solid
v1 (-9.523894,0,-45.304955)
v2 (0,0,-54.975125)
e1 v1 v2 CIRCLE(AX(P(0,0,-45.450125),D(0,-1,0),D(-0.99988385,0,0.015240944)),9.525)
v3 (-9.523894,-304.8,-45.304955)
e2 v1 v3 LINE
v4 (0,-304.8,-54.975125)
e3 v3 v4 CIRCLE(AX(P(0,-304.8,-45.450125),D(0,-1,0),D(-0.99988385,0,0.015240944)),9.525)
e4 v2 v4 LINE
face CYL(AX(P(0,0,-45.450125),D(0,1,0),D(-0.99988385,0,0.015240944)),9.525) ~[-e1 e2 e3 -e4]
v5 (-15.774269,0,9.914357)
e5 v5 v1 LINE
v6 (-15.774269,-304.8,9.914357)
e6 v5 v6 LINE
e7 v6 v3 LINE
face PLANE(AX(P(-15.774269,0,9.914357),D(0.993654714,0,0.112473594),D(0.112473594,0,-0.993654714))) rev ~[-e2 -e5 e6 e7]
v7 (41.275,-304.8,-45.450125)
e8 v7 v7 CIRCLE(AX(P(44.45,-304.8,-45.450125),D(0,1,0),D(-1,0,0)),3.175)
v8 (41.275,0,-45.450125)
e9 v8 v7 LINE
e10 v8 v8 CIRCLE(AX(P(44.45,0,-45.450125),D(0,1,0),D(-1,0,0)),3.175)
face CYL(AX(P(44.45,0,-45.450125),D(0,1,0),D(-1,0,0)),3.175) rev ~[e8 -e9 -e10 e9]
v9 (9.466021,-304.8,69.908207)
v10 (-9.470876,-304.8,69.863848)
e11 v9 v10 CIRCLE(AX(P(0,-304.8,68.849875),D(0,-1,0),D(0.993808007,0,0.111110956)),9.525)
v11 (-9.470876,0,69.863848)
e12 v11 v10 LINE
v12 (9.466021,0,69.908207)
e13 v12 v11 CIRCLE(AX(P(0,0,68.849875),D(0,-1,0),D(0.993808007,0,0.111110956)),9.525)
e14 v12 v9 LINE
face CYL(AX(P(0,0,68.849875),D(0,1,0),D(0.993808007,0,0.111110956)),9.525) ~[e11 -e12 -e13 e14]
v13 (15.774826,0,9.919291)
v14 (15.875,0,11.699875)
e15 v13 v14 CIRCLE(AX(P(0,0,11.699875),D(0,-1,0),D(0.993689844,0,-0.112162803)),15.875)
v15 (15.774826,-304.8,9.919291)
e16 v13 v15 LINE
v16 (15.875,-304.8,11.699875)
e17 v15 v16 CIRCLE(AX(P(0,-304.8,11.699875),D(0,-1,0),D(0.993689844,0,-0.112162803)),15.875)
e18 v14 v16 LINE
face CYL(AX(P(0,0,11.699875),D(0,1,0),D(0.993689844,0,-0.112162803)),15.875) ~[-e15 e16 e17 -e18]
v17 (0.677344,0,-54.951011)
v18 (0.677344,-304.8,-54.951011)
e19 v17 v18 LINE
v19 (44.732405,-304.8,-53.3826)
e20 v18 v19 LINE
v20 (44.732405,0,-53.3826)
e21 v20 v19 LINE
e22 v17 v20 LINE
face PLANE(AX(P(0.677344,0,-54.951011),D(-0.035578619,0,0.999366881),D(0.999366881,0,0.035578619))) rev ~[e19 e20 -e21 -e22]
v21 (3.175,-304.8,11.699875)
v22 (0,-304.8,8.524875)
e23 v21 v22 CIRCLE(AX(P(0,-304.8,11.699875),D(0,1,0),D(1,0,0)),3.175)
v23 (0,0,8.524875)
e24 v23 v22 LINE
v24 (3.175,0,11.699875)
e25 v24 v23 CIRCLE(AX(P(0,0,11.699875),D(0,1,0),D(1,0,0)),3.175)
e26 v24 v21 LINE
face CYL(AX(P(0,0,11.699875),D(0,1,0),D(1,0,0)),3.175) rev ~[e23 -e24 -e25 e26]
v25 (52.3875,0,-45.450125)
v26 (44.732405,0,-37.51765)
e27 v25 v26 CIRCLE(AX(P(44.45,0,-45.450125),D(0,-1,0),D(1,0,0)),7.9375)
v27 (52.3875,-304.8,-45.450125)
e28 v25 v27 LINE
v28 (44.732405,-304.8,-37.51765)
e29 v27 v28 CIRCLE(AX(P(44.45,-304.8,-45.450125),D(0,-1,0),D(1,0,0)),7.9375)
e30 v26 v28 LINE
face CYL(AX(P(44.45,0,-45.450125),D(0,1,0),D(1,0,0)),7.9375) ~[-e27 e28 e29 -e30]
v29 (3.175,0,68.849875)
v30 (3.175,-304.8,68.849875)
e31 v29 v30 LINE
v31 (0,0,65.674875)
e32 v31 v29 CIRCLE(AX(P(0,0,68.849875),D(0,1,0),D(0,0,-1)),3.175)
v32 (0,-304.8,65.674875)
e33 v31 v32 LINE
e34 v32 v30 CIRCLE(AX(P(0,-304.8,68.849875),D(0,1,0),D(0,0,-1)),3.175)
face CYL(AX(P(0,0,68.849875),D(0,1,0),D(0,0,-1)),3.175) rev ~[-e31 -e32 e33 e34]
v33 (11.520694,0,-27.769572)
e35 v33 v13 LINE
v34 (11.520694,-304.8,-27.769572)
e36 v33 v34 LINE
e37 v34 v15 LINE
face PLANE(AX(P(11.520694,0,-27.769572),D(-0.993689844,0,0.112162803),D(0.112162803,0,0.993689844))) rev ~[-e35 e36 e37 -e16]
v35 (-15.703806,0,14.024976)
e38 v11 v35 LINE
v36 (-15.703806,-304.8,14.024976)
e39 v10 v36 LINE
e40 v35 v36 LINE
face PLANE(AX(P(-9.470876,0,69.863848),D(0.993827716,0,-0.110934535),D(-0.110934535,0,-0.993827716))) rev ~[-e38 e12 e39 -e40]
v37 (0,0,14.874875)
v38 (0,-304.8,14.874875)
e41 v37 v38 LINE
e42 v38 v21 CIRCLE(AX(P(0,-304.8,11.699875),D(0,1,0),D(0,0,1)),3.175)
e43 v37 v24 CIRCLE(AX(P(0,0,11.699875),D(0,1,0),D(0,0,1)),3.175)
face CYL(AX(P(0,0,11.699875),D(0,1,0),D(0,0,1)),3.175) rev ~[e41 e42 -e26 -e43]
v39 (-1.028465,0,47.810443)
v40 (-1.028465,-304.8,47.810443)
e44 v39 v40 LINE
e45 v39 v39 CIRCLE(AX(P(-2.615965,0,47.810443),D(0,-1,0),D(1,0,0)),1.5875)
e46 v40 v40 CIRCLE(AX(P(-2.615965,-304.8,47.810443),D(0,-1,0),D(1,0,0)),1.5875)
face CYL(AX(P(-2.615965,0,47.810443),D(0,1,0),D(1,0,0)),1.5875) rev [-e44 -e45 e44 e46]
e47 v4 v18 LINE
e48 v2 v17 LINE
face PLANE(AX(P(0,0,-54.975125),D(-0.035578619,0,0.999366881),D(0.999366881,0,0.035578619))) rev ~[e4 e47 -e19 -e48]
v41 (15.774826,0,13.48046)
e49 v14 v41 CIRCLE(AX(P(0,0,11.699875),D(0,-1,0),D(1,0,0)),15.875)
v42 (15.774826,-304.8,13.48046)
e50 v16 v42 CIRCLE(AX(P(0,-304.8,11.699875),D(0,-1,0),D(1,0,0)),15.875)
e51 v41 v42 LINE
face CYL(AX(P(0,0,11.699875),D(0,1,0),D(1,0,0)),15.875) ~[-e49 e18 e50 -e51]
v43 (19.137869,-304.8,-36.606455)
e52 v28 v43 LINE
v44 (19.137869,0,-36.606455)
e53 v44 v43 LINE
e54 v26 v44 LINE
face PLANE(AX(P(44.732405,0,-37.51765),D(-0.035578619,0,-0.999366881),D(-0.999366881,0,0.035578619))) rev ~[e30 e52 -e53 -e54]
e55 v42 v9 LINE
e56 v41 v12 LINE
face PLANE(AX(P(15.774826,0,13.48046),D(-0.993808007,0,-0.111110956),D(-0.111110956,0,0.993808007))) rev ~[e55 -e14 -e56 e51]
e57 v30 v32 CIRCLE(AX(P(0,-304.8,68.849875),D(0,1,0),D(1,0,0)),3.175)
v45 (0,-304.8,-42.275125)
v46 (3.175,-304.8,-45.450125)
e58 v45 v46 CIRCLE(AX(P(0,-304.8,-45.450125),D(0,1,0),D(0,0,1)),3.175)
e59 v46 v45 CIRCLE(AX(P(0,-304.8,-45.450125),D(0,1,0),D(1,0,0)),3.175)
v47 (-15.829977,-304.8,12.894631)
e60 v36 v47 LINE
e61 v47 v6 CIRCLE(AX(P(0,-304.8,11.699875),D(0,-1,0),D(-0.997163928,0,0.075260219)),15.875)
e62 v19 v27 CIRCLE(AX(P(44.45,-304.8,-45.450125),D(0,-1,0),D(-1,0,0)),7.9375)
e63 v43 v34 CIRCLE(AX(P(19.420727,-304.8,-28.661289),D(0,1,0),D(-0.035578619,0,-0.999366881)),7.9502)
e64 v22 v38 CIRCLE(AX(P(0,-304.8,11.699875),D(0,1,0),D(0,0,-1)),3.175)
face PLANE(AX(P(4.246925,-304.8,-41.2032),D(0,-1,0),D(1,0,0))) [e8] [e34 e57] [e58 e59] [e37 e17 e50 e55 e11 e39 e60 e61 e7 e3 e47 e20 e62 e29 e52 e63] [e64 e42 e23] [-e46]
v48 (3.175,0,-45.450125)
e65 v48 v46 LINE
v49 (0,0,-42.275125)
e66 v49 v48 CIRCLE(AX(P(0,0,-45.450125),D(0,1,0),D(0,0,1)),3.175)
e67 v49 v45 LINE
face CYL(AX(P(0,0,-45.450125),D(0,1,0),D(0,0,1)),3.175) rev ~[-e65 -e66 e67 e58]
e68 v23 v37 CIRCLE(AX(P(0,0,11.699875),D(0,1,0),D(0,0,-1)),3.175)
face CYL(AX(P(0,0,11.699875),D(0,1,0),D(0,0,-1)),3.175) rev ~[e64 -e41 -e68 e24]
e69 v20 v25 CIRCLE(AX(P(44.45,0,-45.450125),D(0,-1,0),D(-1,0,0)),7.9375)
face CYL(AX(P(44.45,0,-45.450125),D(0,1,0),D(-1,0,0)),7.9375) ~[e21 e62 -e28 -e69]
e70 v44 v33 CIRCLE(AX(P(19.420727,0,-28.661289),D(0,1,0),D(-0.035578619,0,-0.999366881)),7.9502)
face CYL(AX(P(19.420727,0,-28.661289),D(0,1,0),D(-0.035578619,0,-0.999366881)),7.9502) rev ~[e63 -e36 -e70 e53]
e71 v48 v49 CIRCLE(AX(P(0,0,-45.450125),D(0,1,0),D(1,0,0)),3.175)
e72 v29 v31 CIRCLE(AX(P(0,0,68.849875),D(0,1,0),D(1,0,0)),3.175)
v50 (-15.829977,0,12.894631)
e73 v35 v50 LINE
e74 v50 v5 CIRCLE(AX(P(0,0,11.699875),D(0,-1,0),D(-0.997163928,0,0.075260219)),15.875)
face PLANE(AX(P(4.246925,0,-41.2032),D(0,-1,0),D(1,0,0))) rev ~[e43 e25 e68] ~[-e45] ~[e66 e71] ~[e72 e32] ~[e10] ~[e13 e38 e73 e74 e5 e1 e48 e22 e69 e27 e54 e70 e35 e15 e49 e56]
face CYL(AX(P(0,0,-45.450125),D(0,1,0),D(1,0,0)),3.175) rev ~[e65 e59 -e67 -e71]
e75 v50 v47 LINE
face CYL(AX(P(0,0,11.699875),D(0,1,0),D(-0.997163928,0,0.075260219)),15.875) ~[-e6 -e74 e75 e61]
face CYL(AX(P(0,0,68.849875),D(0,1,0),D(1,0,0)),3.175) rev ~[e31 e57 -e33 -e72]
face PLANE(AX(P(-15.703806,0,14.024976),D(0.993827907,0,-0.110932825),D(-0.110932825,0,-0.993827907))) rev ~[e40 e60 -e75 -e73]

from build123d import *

# Parameters (mm, degrees)
F0_R     = 1.5875
F1_DEPTH = 304.8


# Not quite as in the source:
# - ends of sketch curves that miss each other by under 0.0002 mm in the source are joined


with BuildPart() as f1:
    # F0 (on Front) → F1 (new body)
    with BuildSketch(Plane.XZ):
        with BuildLine():
            Line((0, -35.9251248209), (0, -42.2751248896))
            ThreePointArc((0, -42.2751248896), (2.2450640303, -43.2050608593), (3.175, -45.4501248896))
            Line((3.175, -45.4501248896), (9.5250000687, -45.4501248896))
            ThreePointArc((9.5250000687, -45.4501248896), (6.7351921394, -38.7149327502), (0, -35.9251248209))
        make_face()
        with BuildLine():
            ThreePointArc((3.175, -45.4501248896), (-2.2450640303, -47.6951889199), (0, -42.2751248896))
            Line((0, -42.2751248896), (0, -35.9251248209))
            ThreePointArc((0, -35.9251248209), (-6.6836697304, -38.6638014929), (-9.5238937406, -45.3049548981))
            ThreePointArc((-9.5238937406, -45.3049548981), (-6.7863233967, -52.13379462), (0, -54.9751249583))
            Line((0, -54.9751249583), (0.6773435819, -54.951010742))
            ThreePointArc((0.6773435819, -54.951010742), (6.9705567917, -51.941424014), (9.5250000687, -45.4501248896))
            Line((9.5250000687, -45.4501248896), (3.175, -45.4501248896))
        make_face()
        with BuildLine():
            Line((36.5125, -45.4501248896), (9.5250000687, -45.4501248896))
            ThreePointArc((9.5250000687, -45.4501248896), (6.9705567917, -51.941424014), (0.6773435819, -54.951010742))
            Line((0.6773435819, -54.951010742), (44.7324052867, -53.3825995038))
            ThreePointArc((44.7324052867, -53.3825995038), (38.9380895197, -51.1617576778), (36.5125, -45.4501248896))
        make_face()
        with BuildLine():
            Line((0, -4.1751248896), (0, -35.9251248209))
            ThreePointArc((0, -35.9251248209), (6.7351921394, -38.7149327502), (9.5250000687, -45.4501248896))
            Line((9.5250000687, -45.4501248896), (36.5125, -45.4501248896))
            ThreePointArc((36.5125, -45.4501248896), (38.9380895197, -39.7384921015), (44.7324052867, -37.5176502755))
            Line((44.7324052867, -37.5176502755), (19.1378694473, -36.6064551461))
            ThreePointArc((19.1378694473, -36.6064551461), (13.3988872221, -33.8519658653), (11.5206935861, -27.7695718592))
            Line((11.5206935861, -27.7695718592), (15.7748262706, 9.9192906189))
            ThreePointArc((15.7748262706, 9.9192906189), (10.5770706294, -0.1382498214), (0, -4.1751248896))
        make_face()
        with BuildLine():
            ThreePointArc((-9.5238937406, -45.3049548981), (-6.6836697304, -38.6638014929), (0, -35.9251248209))
            Line((0, -35.9251248209), (0, -4.1751248896))
            ThreePointArc((0, -4.1751248896), (-10.5752191937, -0.1399037729), (-15.7742685853, 9.9143568106))
            Line((-15.7742685853, 9.9143568106), (-9.5238937406, -45.3049548981))
        make_face()
        with BuildLine():
            ThreePointArc((-15.7038062969, 14.0249757078), (-10.370743778, 23.7191637121), (0, 27.5748751104))
            Line((0, 27.5748751104), (0, 47.8104427457))
            Line((0, 47.8104427457), (0, 59.3248751104))
            ThreePointArc((0, 59.3248751104), (-7.0846213328, 62.4832617586), (-9.4708755422, 69.8638482188))
            Line((-9.4708755422, 69.8638482188), (-15.7038062969, 14.0249757078))
        make_face()
        with Locations((-2.6159647387, 47.8104427457)):
            Circle(F0_R, mode=Mode.SUBTRACT)
        with BuildLine():
            Line((0, 47.8104427457), (0, 27.5748751104))
            ThreePointArc((0, 27.5748751104), (10.5770706294, 23.5380000422), (15.7748262706, 13.4804596019))
            Line((15.7748262706, 13.4804596019), (9.4660212705, 69.9082069616))
            ThreePointArc((9.4660212705, 69.9082069616), (9.5102438875, 69.3798620908), (9.525, 68.8498751104))
            ThreePointArc((9.525, 68.8498751104), (6.7351920908, 62.1146830196), (0, 59.3248751104))
            Line((0, 59.3248751104), (0, 47.8104427457))
        make_face()
        with BuildLine():
            ThreePointArc((9.4660212705, 69.9082069616), (-0.0223117795, 78.3748489783), (-9.4708755422, 69.8638482188))
            ThreePointArc((-9.4708755422, 69.8638482188), (-7.0846213328, 62.4832617586), (0, 59.3248751104))
            ThreePointArc((0, 59.3248751104), (6.7351920908, 62.1146830196), (9.525, 68.8498751104))
            ThreePointArc((9.525, 68.8498751104), (9.5102438875, 69.3798620908), (9.4660212705, 69.9082069616))
        make_face()
        with BuildLine():
            ThreePointArc((3.175, 68.8498751104), (2.2450640303, 66.6048110801), (0, 65.6748751104))
            ThreePointArc((0, 65.6748751104), (-2.2450640303, 71.0949391407), (3.175, 68.8498751104))
        make_face(mode=Mode.SUBTRACT)
        with BuildLine():
            ThreePointArc((44.7324052867, -37.5176502755), (38.9380895197, -39.7384921015), (36.5125, -45.4501248896))
            ThreePointArc((36.5125, -45.4501248896), (38.9380895197, -51.1617576778), (44.7324052867, -53.3825995038))
            ThreePointArc((44.7324052867, -53.3825995038), (50.1616327882, -50.96203537), (52.3875, -45.4501248896))
            ThreePointArc((52.3875, -45.4501248896), (50.1616327882, -39.9382144093), (44.7324052867, -37.5176502755))
        make_face()
        with BuildLine():
            ThreePointArc((47.625, -45.4501248896), (44.45, -48.6251248896), (41.275, -45.4501248896))
            ThreePointArc((41.275, -45.4501248896), (44.45, -42.2751248896), (47.625, -45.4501248896))
        make_face(mode=Mode.SUBTRACT)
        with BuildLine():
            Line((0, 8.5248751104), (0, -4.1751248896))
            ThreePointArc((0, -4.1751248896), (10.5770706294, -0.1382498214), (15.7748262706, 9.9192906189))
            ThreePointArc((15.7748262706, 9.9192906189), (15.8499367829, 10.8081750617), (15.875, 11.6998751104))
            ThreePointArc((15.875, 11.6998751104), (15.8499367829, 12.5915751591), (15.7748262706, 13.4804596019))
            ThreePointArc((15.7748262706, 13.4804596019), (10.5770706294, 23.5380000422), (0, 27.5748751104))
            Line((0, 27.5748751104), (0, 14.8748751104))
            ThreePointArc((0, 14.8748751104), (2.2450640303, 13.9449391407), (3.175, 11.6998751104))
            ThreePointArc((3.175, 11.6998751104), (2.2450640303, 9.4548110801), (0, 8.5248751104))
        make_face()
        with BuildLine():
            ThreePointArc((-15.7742685853, 9.9143568106), (-10.5752191937, -0.1399037729), (0, -4.1751248896))
            Line((0, -4.1751248896), (0, 8.5248751104))
            ThreePointArc((0, 8.5248751104), (-3.175, 11.6998751104), (0, 14.8748751104))
            Line((0, 14.8748751104), (0, 27.5748751104))
            ThreePointArc((0, 27.5748751104), (-10.370743778, 23.7191637121), (-15.7038062969, 14.0249757078))
            Line((-15.7038062969, 14.0249757078), (-15.8299773584, 12.8946310826))
            ThreePointArc((-15.8299773584, 12.8946310826), (-15.8722272886, 11.4031835217), (-15.7742685853, 9.9143568106))
        make_face()
    extrude(amount=F1_DEPTH)


solid = f1.part
